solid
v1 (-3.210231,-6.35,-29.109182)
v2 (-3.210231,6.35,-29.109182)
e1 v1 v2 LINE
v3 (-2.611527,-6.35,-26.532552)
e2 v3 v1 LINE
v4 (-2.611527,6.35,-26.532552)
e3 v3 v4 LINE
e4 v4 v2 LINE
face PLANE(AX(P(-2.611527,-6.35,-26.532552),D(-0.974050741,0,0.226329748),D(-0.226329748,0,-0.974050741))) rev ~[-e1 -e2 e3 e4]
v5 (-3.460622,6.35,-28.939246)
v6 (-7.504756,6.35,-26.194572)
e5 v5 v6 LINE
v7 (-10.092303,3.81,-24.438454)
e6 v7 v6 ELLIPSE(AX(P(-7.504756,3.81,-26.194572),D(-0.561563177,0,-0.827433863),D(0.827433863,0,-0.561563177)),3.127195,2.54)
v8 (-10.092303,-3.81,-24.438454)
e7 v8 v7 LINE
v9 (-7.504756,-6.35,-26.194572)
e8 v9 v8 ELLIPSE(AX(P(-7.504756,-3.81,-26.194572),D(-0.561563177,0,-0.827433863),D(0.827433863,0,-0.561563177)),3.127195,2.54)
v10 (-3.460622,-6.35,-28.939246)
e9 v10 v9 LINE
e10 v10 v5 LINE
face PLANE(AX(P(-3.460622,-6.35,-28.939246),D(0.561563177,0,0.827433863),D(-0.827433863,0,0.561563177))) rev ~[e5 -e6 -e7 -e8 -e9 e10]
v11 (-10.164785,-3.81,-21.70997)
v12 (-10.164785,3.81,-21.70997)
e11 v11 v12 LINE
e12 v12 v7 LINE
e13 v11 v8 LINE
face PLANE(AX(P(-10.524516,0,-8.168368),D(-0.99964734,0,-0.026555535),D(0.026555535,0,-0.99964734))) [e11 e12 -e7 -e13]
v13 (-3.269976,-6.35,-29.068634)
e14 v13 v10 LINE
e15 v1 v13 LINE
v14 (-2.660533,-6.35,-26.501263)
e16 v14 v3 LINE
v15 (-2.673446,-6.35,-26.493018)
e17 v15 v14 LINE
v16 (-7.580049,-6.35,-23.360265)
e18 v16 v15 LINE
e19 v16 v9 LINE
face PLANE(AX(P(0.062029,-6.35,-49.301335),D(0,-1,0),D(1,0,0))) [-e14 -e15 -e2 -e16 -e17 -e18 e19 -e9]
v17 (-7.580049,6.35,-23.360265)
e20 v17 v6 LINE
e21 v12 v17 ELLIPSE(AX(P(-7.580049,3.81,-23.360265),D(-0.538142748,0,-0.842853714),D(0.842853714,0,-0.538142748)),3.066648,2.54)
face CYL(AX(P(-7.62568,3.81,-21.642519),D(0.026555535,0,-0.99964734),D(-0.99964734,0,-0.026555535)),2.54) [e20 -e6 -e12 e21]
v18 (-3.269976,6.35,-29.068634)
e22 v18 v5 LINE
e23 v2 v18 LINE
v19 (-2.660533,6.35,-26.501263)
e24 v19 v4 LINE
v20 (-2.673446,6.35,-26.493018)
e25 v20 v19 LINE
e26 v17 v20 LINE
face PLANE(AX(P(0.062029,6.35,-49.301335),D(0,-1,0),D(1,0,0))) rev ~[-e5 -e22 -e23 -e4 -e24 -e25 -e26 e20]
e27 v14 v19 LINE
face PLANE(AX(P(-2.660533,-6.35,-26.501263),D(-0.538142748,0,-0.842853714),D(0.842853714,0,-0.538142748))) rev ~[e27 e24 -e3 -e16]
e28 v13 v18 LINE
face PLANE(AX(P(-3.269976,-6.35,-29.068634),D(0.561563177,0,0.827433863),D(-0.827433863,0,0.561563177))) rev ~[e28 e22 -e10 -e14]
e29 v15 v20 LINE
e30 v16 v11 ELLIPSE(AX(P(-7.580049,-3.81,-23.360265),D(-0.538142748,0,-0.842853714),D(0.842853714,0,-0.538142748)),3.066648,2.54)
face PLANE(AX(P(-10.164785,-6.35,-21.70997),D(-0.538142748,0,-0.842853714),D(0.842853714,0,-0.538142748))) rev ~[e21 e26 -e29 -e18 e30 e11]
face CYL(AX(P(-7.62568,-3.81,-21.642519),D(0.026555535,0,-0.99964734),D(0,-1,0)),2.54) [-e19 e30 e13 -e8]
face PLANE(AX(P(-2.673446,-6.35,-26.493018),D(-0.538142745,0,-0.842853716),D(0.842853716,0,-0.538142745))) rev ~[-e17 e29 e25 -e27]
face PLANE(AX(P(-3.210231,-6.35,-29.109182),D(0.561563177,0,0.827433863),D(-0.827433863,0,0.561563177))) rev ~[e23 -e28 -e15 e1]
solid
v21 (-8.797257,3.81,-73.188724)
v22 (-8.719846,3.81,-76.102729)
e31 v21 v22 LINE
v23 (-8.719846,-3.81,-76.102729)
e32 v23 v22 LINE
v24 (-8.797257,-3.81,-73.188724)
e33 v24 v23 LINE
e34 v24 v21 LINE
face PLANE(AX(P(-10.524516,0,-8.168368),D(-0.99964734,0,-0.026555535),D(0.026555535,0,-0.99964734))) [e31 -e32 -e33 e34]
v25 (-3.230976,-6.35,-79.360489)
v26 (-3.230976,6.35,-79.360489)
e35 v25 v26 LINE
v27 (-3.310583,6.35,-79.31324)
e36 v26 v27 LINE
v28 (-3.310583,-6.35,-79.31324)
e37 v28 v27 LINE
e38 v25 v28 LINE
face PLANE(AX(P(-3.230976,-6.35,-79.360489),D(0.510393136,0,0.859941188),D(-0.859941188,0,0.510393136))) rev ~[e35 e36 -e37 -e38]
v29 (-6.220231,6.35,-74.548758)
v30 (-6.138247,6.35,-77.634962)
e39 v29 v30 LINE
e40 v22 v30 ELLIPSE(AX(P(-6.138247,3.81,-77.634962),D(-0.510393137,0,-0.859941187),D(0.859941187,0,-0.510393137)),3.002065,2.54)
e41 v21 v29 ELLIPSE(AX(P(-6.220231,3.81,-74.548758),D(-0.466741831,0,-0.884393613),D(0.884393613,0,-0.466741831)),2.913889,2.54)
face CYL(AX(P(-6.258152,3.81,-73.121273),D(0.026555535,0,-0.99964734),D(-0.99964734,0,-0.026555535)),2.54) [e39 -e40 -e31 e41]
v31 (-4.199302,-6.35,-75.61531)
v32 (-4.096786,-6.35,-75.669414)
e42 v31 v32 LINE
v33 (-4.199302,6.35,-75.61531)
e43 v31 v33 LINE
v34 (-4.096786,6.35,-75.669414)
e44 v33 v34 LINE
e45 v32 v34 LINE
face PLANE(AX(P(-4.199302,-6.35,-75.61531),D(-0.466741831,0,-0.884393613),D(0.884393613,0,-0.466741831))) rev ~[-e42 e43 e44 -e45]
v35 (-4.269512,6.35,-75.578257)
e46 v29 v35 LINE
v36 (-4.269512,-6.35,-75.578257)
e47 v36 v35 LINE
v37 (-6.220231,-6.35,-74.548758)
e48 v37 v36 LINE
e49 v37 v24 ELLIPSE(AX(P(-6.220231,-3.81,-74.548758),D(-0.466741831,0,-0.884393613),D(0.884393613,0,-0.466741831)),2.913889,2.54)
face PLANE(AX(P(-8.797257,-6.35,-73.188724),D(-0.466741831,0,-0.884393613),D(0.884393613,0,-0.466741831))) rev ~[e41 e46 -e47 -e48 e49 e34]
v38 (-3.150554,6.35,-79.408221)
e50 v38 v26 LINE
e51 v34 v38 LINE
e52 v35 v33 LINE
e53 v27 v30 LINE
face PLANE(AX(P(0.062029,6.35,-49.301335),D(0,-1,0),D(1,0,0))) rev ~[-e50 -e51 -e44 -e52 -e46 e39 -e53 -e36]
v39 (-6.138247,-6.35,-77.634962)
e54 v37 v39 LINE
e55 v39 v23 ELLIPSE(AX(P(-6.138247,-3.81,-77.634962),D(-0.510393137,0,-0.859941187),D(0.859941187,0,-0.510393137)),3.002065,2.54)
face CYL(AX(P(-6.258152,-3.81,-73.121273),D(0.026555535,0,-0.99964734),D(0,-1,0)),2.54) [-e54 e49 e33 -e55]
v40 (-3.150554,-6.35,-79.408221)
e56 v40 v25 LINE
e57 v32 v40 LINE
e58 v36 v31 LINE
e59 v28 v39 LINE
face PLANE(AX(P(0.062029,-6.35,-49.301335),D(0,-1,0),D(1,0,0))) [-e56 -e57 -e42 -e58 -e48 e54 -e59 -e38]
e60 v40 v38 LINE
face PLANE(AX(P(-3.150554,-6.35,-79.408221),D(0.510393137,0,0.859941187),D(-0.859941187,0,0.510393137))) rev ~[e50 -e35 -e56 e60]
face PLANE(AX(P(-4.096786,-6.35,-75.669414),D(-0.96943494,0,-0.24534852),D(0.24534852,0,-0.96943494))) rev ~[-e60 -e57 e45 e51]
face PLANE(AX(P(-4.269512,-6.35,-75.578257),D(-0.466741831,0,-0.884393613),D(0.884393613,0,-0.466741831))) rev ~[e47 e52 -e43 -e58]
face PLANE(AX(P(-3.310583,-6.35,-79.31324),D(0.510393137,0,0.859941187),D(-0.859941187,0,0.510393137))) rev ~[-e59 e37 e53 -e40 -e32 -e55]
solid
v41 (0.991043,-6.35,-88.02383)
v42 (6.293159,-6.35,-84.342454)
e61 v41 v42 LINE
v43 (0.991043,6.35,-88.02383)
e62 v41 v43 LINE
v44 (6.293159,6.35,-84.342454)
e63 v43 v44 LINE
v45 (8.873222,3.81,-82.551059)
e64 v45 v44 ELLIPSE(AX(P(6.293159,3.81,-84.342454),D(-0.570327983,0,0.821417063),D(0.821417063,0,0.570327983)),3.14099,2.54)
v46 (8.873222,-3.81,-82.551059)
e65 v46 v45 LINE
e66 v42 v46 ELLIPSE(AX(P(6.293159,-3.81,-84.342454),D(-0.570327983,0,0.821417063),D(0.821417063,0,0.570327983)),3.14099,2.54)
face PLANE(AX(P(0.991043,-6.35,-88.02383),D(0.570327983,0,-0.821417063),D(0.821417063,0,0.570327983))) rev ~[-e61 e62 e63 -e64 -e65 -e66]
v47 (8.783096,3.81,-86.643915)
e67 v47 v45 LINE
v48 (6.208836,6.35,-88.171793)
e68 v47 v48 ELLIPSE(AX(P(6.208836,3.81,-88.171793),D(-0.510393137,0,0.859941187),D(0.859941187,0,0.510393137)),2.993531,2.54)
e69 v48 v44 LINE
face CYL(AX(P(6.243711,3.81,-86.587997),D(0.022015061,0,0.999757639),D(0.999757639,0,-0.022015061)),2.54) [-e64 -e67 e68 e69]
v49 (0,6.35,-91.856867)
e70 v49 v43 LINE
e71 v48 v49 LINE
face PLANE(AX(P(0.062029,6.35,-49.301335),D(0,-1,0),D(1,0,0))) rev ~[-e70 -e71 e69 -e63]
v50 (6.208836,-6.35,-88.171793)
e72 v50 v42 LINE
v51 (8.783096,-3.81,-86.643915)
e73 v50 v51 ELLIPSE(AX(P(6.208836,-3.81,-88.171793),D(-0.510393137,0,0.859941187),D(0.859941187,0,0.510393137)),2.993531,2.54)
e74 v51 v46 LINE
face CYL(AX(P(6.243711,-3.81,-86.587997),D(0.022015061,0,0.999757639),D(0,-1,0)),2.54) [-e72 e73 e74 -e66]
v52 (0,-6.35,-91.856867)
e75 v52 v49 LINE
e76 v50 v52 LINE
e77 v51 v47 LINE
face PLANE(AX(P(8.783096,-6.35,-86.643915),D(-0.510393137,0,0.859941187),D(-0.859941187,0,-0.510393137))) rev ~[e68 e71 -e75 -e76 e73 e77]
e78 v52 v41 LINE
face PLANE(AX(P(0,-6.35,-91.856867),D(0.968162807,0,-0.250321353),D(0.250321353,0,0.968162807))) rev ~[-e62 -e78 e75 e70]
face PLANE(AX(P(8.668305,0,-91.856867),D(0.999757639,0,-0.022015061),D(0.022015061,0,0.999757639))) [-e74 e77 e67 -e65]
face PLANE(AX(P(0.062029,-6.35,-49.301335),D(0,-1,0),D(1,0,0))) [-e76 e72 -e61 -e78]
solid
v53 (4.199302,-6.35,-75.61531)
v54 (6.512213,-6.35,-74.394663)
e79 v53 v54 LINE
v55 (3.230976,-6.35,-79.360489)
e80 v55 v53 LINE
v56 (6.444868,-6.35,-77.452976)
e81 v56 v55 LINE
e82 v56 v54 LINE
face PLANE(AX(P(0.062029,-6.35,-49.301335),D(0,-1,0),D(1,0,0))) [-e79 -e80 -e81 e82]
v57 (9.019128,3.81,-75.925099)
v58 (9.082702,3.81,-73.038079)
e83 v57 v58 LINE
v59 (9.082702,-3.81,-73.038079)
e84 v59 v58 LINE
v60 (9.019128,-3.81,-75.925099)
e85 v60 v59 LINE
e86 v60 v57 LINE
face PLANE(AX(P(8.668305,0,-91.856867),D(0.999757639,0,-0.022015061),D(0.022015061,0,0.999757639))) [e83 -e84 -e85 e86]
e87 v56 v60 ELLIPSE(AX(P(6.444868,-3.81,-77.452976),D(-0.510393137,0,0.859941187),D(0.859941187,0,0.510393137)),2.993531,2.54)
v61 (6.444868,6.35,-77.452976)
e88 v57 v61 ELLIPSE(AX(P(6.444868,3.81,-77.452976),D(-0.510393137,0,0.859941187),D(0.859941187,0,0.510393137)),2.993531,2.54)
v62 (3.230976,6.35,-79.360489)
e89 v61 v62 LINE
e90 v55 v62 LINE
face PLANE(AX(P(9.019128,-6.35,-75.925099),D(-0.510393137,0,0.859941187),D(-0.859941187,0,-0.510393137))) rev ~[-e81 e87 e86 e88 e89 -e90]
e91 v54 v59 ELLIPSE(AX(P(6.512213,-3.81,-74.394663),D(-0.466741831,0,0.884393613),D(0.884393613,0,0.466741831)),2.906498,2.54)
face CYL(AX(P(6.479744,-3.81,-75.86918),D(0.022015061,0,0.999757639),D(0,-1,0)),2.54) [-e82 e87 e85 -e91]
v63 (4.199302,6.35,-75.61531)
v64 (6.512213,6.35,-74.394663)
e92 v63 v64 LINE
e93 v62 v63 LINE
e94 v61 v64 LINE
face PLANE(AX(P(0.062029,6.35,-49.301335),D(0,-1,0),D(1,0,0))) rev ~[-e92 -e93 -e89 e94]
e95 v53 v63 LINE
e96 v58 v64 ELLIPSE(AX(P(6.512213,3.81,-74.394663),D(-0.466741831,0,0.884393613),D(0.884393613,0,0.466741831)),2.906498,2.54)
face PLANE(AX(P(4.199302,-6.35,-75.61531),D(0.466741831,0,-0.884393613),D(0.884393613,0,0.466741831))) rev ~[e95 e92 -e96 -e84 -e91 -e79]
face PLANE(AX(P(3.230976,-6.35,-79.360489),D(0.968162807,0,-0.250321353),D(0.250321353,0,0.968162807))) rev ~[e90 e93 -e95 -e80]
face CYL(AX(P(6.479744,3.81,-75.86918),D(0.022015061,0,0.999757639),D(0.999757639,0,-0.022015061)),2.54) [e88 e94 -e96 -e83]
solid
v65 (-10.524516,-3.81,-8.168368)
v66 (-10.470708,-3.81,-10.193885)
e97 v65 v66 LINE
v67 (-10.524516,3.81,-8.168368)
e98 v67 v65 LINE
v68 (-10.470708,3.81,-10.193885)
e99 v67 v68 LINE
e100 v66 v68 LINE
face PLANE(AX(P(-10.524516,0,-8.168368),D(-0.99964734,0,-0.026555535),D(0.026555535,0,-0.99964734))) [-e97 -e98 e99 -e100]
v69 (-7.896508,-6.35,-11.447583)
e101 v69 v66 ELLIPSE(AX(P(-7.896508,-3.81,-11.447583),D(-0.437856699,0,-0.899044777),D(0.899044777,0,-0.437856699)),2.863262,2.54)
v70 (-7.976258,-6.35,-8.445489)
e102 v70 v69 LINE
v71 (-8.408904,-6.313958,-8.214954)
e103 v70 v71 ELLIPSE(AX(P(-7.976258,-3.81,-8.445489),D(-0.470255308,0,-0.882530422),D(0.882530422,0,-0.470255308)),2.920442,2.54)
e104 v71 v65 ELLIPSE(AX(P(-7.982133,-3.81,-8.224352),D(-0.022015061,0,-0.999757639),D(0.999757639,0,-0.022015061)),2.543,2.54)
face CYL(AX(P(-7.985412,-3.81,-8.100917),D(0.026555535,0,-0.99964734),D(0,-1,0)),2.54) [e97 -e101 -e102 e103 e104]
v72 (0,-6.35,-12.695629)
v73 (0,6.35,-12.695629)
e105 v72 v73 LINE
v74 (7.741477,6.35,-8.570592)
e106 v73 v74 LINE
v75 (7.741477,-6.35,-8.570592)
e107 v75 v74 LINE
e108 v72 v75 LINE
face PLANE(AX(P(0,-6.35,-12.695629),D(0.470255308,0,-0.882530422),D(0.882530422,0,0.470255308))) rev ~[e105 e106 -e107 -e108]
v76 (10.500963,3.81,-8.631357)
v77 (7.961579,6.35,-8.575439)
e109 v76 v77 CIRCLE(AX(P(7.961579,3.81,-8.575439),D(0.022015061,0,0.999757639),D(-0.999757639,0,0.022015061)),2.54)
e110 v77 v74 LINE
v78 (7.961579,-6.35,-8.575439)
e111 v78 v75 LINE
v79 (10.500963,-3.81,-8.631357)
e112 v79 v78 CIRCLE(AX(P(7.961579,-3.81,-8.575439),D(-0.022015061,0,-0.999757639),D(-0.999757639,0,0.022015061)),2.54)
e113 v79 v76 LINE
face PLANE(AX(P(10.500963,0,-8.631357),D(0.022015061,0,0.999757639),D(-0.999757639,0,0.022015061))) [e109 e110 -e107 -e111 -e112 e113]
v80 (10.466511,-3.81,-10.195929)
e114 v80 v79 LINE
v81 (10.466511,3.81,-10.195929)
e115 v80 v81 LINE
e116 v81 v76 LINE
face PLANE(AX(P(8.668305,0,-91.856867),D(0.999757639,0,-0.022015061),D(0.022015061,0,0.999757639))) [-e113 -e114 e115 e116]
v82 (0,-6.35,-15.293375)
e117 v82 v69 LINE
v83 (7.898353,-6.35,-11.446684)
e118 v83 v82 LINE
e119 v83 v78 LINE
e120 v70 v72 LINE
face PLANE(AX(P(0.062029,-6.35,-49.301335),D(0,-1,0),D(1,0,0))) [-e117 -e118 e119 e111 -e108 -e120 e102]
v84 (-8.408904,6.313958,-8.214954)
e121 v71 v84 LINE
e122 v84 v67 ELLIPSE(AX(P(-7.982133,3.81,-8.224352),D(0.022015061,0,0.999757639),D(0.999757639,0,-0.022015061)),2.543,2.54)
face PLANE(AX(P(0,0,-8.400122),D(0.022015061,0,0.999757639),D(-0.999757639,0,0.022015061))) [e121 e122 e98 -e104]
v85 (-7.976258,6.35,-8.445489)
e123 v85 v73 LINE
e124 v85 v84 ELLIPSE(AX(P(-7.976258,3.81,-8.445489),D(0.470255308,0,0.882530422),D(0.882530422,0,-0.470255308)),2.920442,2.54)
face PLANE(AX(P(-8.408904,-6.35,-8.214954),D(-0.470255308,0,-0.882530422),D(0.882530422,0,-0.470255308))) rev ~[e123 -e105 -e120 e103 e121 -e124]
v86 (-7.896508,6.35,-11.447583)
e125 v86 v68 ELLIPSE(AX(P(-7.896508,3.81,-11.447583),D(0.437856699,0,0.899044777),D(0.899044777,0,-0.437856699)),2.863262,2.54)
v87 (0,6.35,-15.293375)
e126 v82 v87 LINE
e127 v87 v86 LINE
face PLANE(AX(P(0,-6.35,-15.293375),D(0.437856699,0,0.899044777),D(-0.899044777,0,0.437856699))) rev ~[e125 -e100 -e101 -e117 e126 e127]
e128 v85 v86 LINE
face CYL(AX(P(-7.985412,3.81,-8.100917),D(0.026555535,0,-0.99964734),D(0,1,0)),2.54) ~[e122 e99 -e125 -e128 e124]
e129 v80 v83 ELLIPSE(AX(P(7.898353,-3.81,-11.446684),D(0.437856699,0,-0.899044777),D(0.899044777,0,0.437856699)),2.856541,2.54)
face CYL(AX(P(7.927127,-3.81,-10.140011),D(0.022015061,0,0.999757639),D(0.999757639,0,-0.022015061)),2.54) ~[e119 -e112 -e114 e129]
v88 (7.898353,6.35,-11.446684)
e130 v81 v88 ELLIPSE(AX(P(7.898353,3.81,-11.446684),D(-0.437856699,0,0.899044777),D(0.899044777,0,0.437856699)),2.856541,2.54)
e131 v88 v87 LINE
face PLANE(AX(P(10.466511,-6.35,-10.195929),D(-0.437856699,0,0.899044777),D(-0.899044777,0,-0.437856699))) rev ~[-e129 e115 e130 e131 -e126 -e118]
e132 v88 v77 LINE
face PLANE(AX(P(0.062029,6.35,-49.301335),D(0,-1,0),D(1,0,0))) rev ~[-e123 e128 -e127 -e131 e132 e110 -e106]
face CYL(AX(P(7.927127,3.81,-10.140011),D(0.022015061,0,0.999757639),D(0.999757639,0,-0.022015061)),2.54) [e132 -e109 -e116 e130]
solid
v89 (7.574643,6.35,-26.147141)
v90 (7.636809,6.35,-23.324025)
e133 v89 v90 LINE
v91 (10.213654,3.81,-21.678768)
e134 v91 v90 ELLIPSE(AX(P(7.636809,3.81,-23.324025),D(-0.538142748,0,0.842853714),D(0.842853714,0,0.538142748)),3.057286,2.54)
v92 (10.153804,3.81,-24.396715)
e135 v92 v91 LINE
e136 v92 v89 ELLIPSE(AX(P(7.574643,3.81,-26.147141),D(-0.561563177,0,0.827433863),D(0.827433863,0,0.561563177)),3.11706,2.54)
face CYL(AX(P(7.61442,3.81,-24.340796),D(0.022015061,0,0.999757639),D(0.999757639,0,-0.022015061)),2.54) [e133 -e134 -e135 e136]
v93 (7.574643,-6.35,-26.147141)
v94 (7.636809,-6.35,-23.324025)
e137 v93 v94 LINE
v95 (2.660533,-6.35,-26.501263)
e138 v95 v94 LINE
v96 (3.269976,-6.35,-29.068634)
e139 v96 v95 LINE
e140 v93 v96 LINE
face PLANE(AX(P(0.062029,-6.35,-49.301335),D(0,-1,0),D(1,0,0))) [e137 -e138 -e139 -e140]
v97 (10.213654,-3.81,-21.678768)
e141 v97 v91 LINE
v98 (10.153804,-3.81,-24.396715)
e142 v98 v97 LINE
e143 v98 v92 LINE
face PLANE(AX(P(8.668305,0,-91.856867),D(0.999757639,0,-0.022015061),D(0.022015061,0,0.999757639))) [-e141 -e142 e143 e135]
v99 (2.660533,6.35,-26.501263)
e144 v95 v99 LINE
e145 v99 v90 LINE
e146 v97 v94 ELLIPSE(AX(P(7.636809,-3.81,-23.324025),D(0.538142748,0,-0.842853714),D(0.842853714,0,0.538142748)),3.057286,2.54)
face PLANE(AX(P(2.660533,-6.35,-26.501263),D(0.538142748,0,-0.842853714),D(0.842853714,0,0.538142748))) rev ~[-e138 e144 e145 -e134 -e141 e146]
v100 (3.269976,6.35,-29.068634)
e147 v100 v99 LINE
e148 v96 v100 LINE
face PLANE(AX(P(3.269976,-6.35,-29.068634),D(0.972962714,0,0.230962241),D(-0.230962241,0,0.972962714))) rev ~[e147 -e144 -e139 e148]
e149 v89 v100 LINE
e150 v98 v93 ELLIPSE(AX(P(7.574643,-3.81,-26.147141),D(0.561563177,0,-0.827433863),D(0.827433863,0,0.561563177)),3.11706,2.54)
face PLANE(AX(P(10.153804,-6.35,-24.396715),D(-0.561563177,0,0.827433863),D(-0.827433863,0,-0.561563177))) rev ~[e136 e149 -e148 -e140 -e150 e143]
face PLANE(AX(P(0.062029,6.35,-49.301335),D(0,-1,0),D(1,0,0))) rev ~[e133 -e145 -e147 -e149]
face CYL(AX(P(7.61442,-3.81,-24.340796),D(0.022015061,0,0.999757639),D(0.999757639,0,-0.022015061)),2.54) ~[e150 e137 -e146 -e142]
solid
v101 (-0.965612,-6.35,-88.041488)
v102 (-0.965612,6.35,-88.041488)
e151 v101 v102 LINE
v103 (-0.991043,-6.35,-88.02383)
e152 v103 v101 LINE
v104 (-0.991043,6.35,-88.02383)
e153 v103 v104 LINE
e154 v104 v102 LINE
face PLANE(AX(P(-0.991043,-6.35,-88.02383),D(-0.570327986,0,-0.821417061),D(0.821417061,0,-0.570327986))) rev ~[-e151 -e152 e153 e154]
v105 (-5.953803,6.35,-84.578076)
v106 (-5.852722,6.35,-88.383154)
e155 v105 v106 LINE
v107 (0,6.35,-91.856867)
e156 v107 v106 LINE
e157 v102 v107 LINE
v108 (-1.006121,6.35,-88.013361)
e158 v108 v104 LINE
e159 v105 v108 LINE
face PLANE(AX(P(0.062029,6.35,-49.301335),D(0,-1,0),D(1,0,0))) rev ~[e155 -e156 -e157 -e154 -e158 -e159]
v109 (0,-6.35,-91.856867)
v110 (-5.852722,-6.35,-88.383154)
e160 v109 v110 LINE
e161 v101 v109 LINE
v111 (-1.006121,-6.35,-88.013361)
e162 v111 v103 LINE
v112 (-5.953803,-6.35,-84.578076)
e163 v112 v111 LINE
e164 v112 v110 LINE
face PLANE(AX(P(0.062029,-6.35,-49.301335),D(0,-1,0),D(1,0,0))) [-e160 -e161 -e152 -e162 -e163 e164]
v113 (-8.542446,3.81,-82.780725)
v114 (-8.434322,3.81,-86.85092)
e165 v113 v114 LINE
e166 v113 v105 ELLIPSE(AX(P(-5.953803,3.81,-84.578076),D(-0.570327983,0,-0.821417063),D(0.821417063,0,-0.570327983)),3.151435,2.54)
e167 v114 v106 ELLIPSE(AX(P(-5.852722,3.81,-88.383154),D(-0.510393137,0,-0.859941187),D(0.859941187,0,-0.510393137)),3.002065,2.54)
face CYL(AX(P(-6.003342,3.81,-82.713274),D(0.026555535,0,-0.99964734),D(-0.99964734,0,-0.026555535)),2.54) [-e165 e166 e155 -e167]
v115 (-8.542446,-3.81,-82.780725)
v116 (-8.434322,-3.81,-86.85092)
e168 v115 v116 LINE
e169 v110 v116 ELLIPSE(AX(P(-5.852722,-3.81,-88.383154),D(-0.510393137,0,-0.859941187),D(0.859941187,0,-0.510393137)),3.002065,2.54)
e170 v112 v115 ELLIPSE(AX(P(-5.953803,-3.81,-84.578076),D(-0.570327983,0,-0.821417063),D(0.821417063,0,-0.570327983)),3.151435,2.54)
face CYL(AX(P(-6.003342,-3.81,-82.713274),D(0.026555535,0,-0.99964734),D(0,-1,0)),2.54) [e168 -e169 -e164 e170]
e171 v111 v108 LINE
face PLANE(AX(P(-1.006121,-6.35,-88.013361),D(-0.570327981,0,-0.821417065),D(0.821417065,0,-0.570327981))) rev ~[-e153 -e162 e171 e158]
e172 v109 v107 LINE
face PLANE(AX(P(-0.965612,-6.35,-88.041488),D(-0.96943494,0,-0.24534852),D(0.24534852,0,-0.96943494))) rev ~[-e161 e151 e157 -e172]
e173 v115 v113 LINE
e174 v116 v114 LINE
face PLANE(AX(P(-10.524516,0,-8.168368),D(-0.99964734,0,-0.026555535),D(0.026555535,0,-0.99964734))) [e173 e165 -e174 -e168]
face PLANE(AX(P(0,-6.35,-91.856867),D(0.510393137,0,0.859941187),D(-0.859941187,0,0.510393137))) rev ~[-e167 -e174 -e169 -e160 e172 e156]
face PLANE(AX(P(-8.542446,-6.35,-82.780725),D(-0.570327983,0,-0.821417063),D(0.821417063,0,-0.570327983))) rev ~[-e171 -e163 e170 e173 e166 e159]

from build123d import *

# Parameters (mm, degrees)
F1_DEPTH = 6.35
F2_DEPTH = 6.35
F4_DEPTH = 25.4
F5_R     = 2.54


with BuildPart() as f1:
    # F0 (on Front) → F1 (new body)
    with BuildSketch(Plane.XZ):
        Polygon((10.5009634349, -8.6313571018), (0, -8.4001217037), (-10.5245159939, -8.168367669), (-8.3013391122, -91.856867075), (8.6683045514, -91.856867075), align=None)
    extrude(amount=F1_DEPTH)

    # F2 (add): a face of the model
    f2_faces = [f1.faces().sort_by_distance(p)[0] for p in [
        (0.0745348421, 0, -48.6438367355),
    ]]
    extrude(f2_faces, amount=F2_DEPTH)

    # F3 (on face) → F4 (cut)
    with BuildSketch(Plane.XZ.offset(6.35)):
        Polygon((-8.4089043082, -8.2149542811), (0, -12.6956291497), (7.741477061, -8.5705921125), align=None)
        Polygon((0, -15.2933746576), (-10.4707083295, -10.1938847244), (-10.1647846318, -21.7099702861), (-2.6734457948, -26.4930181658), (-2.660532576, -26.5012629595), (-2.6115273083, -26.532551698), align=None)
        Polygon((10.2136542458, -21.6787681594), (10.4665109394, -10.1959289555), (0, -15.2933746576), (2.660532576, -26.5012629595), align=None)
        Polygon((2.660532576, -26.5012629595), (0, -15.2933746576), (-2.6115273083, -26.532551698), (-3.2102312503, -29.1091816943), (-9.2748739024, -55.2094611118), (-4.0967862529, -75.6694136894), (-3.1505538377, -79.4082206875), (-0.965611629, -88.0414878319), (0, -91.856867075), (0.9910429813, -88.023830283), (3.2309755221, -79.3604887305), (4.199302435, -75.6153104147), (9.4752950296, -55.2094611118), (3.2699760565, -29.068634063), align=None)
        Polygon((-3.4606218927, -28.9392464633), (-10.0923027152, -24.4384544155), (-9.2748739024, -55.2094611118), (-3.2102312503, -29.1091816943), (-3.2699760565, -29.068634063), align=None)
        Polygon((9.4752950296, -55.2094611118), (10.15380398, -24.3967147102), (3.2699760565, -29.068634063), align=None)
        Polygon((-4.0967862529, -75.6694136894), (-9.2748739024, -55.2094611118), (-8.7972565245, -73.1887240187), (-4.2695118804, -75.5782571337), (-4.199302435, -75.6153104147), align=None)
        Polygon((9.0827017549, -73.0380792973), (9.4752950296, -55.2094611118), (4.199302435, -75.6153104147), align=None)
        Polygon((-0.965611629, -88.0414878319), (-3.1505538377, -79.4082206875), (-3.2309755221, -79.3604887305), (-3.3105833326, -79.3132398248), (-8.7198462703, -76.1027287805), (-8.5424459568, -82.7807246478), (-1.0061214638, -88.0133609601), (-0.9910429813, -88.023830283), align=None)
        Polygon((9.0191284413, -75.9250985328), (3.2309755221, -79.3604887305), (0.9910429813, -88.023830283), (8.8732221424, -82.5510594467), align=None)
        Polygon((-8.3013391122, -91.856867075), (0, -91.856867075), (-8.434321605, -86.8509202434), align=None)
        Polygon((8.7830958233, -86.6439154273), (0, -91.856867075), (8.6683045514, -91.856867075), align=None)
    extrude(amount=-F4_DEPTH, mode=Mode.SUBTRACT)

    # F5
    f5_edges = [f1.edges().sort_by_distance(p)[0] for p in [
        (-10.497612, -6.35, -9.181126),
        (-10.128544, -6.35, -23.074212),
        (-8.758551, -6.35, -74.645726),
        (-8.488384, -6.35, -84.815822),
        (-8.758551, 6.35, -74.645726),
        (-8.488384, 6.35, -84.815822),
        (9.050915, -6.35, -74.481589),
        (8.828159, -6.35, -84.597487),
        (-10.497612, 6.35, -9.181126),
        (-10.128544, 6.35, -23.074212),
        (10.183729, -6.35, -23.037741),
        (10.483737, -6.35, -9.413643),
        (10.483737, 6.35, -9.413643),
        (10.183729, 6.35, -23.037741),
        (8.828159, 6.35, -84.597487),
        (9.050915, 6.35, -74.481589),
    ]]
    fillet(f5_edges, radius=F5_R)


solid = f1.part
